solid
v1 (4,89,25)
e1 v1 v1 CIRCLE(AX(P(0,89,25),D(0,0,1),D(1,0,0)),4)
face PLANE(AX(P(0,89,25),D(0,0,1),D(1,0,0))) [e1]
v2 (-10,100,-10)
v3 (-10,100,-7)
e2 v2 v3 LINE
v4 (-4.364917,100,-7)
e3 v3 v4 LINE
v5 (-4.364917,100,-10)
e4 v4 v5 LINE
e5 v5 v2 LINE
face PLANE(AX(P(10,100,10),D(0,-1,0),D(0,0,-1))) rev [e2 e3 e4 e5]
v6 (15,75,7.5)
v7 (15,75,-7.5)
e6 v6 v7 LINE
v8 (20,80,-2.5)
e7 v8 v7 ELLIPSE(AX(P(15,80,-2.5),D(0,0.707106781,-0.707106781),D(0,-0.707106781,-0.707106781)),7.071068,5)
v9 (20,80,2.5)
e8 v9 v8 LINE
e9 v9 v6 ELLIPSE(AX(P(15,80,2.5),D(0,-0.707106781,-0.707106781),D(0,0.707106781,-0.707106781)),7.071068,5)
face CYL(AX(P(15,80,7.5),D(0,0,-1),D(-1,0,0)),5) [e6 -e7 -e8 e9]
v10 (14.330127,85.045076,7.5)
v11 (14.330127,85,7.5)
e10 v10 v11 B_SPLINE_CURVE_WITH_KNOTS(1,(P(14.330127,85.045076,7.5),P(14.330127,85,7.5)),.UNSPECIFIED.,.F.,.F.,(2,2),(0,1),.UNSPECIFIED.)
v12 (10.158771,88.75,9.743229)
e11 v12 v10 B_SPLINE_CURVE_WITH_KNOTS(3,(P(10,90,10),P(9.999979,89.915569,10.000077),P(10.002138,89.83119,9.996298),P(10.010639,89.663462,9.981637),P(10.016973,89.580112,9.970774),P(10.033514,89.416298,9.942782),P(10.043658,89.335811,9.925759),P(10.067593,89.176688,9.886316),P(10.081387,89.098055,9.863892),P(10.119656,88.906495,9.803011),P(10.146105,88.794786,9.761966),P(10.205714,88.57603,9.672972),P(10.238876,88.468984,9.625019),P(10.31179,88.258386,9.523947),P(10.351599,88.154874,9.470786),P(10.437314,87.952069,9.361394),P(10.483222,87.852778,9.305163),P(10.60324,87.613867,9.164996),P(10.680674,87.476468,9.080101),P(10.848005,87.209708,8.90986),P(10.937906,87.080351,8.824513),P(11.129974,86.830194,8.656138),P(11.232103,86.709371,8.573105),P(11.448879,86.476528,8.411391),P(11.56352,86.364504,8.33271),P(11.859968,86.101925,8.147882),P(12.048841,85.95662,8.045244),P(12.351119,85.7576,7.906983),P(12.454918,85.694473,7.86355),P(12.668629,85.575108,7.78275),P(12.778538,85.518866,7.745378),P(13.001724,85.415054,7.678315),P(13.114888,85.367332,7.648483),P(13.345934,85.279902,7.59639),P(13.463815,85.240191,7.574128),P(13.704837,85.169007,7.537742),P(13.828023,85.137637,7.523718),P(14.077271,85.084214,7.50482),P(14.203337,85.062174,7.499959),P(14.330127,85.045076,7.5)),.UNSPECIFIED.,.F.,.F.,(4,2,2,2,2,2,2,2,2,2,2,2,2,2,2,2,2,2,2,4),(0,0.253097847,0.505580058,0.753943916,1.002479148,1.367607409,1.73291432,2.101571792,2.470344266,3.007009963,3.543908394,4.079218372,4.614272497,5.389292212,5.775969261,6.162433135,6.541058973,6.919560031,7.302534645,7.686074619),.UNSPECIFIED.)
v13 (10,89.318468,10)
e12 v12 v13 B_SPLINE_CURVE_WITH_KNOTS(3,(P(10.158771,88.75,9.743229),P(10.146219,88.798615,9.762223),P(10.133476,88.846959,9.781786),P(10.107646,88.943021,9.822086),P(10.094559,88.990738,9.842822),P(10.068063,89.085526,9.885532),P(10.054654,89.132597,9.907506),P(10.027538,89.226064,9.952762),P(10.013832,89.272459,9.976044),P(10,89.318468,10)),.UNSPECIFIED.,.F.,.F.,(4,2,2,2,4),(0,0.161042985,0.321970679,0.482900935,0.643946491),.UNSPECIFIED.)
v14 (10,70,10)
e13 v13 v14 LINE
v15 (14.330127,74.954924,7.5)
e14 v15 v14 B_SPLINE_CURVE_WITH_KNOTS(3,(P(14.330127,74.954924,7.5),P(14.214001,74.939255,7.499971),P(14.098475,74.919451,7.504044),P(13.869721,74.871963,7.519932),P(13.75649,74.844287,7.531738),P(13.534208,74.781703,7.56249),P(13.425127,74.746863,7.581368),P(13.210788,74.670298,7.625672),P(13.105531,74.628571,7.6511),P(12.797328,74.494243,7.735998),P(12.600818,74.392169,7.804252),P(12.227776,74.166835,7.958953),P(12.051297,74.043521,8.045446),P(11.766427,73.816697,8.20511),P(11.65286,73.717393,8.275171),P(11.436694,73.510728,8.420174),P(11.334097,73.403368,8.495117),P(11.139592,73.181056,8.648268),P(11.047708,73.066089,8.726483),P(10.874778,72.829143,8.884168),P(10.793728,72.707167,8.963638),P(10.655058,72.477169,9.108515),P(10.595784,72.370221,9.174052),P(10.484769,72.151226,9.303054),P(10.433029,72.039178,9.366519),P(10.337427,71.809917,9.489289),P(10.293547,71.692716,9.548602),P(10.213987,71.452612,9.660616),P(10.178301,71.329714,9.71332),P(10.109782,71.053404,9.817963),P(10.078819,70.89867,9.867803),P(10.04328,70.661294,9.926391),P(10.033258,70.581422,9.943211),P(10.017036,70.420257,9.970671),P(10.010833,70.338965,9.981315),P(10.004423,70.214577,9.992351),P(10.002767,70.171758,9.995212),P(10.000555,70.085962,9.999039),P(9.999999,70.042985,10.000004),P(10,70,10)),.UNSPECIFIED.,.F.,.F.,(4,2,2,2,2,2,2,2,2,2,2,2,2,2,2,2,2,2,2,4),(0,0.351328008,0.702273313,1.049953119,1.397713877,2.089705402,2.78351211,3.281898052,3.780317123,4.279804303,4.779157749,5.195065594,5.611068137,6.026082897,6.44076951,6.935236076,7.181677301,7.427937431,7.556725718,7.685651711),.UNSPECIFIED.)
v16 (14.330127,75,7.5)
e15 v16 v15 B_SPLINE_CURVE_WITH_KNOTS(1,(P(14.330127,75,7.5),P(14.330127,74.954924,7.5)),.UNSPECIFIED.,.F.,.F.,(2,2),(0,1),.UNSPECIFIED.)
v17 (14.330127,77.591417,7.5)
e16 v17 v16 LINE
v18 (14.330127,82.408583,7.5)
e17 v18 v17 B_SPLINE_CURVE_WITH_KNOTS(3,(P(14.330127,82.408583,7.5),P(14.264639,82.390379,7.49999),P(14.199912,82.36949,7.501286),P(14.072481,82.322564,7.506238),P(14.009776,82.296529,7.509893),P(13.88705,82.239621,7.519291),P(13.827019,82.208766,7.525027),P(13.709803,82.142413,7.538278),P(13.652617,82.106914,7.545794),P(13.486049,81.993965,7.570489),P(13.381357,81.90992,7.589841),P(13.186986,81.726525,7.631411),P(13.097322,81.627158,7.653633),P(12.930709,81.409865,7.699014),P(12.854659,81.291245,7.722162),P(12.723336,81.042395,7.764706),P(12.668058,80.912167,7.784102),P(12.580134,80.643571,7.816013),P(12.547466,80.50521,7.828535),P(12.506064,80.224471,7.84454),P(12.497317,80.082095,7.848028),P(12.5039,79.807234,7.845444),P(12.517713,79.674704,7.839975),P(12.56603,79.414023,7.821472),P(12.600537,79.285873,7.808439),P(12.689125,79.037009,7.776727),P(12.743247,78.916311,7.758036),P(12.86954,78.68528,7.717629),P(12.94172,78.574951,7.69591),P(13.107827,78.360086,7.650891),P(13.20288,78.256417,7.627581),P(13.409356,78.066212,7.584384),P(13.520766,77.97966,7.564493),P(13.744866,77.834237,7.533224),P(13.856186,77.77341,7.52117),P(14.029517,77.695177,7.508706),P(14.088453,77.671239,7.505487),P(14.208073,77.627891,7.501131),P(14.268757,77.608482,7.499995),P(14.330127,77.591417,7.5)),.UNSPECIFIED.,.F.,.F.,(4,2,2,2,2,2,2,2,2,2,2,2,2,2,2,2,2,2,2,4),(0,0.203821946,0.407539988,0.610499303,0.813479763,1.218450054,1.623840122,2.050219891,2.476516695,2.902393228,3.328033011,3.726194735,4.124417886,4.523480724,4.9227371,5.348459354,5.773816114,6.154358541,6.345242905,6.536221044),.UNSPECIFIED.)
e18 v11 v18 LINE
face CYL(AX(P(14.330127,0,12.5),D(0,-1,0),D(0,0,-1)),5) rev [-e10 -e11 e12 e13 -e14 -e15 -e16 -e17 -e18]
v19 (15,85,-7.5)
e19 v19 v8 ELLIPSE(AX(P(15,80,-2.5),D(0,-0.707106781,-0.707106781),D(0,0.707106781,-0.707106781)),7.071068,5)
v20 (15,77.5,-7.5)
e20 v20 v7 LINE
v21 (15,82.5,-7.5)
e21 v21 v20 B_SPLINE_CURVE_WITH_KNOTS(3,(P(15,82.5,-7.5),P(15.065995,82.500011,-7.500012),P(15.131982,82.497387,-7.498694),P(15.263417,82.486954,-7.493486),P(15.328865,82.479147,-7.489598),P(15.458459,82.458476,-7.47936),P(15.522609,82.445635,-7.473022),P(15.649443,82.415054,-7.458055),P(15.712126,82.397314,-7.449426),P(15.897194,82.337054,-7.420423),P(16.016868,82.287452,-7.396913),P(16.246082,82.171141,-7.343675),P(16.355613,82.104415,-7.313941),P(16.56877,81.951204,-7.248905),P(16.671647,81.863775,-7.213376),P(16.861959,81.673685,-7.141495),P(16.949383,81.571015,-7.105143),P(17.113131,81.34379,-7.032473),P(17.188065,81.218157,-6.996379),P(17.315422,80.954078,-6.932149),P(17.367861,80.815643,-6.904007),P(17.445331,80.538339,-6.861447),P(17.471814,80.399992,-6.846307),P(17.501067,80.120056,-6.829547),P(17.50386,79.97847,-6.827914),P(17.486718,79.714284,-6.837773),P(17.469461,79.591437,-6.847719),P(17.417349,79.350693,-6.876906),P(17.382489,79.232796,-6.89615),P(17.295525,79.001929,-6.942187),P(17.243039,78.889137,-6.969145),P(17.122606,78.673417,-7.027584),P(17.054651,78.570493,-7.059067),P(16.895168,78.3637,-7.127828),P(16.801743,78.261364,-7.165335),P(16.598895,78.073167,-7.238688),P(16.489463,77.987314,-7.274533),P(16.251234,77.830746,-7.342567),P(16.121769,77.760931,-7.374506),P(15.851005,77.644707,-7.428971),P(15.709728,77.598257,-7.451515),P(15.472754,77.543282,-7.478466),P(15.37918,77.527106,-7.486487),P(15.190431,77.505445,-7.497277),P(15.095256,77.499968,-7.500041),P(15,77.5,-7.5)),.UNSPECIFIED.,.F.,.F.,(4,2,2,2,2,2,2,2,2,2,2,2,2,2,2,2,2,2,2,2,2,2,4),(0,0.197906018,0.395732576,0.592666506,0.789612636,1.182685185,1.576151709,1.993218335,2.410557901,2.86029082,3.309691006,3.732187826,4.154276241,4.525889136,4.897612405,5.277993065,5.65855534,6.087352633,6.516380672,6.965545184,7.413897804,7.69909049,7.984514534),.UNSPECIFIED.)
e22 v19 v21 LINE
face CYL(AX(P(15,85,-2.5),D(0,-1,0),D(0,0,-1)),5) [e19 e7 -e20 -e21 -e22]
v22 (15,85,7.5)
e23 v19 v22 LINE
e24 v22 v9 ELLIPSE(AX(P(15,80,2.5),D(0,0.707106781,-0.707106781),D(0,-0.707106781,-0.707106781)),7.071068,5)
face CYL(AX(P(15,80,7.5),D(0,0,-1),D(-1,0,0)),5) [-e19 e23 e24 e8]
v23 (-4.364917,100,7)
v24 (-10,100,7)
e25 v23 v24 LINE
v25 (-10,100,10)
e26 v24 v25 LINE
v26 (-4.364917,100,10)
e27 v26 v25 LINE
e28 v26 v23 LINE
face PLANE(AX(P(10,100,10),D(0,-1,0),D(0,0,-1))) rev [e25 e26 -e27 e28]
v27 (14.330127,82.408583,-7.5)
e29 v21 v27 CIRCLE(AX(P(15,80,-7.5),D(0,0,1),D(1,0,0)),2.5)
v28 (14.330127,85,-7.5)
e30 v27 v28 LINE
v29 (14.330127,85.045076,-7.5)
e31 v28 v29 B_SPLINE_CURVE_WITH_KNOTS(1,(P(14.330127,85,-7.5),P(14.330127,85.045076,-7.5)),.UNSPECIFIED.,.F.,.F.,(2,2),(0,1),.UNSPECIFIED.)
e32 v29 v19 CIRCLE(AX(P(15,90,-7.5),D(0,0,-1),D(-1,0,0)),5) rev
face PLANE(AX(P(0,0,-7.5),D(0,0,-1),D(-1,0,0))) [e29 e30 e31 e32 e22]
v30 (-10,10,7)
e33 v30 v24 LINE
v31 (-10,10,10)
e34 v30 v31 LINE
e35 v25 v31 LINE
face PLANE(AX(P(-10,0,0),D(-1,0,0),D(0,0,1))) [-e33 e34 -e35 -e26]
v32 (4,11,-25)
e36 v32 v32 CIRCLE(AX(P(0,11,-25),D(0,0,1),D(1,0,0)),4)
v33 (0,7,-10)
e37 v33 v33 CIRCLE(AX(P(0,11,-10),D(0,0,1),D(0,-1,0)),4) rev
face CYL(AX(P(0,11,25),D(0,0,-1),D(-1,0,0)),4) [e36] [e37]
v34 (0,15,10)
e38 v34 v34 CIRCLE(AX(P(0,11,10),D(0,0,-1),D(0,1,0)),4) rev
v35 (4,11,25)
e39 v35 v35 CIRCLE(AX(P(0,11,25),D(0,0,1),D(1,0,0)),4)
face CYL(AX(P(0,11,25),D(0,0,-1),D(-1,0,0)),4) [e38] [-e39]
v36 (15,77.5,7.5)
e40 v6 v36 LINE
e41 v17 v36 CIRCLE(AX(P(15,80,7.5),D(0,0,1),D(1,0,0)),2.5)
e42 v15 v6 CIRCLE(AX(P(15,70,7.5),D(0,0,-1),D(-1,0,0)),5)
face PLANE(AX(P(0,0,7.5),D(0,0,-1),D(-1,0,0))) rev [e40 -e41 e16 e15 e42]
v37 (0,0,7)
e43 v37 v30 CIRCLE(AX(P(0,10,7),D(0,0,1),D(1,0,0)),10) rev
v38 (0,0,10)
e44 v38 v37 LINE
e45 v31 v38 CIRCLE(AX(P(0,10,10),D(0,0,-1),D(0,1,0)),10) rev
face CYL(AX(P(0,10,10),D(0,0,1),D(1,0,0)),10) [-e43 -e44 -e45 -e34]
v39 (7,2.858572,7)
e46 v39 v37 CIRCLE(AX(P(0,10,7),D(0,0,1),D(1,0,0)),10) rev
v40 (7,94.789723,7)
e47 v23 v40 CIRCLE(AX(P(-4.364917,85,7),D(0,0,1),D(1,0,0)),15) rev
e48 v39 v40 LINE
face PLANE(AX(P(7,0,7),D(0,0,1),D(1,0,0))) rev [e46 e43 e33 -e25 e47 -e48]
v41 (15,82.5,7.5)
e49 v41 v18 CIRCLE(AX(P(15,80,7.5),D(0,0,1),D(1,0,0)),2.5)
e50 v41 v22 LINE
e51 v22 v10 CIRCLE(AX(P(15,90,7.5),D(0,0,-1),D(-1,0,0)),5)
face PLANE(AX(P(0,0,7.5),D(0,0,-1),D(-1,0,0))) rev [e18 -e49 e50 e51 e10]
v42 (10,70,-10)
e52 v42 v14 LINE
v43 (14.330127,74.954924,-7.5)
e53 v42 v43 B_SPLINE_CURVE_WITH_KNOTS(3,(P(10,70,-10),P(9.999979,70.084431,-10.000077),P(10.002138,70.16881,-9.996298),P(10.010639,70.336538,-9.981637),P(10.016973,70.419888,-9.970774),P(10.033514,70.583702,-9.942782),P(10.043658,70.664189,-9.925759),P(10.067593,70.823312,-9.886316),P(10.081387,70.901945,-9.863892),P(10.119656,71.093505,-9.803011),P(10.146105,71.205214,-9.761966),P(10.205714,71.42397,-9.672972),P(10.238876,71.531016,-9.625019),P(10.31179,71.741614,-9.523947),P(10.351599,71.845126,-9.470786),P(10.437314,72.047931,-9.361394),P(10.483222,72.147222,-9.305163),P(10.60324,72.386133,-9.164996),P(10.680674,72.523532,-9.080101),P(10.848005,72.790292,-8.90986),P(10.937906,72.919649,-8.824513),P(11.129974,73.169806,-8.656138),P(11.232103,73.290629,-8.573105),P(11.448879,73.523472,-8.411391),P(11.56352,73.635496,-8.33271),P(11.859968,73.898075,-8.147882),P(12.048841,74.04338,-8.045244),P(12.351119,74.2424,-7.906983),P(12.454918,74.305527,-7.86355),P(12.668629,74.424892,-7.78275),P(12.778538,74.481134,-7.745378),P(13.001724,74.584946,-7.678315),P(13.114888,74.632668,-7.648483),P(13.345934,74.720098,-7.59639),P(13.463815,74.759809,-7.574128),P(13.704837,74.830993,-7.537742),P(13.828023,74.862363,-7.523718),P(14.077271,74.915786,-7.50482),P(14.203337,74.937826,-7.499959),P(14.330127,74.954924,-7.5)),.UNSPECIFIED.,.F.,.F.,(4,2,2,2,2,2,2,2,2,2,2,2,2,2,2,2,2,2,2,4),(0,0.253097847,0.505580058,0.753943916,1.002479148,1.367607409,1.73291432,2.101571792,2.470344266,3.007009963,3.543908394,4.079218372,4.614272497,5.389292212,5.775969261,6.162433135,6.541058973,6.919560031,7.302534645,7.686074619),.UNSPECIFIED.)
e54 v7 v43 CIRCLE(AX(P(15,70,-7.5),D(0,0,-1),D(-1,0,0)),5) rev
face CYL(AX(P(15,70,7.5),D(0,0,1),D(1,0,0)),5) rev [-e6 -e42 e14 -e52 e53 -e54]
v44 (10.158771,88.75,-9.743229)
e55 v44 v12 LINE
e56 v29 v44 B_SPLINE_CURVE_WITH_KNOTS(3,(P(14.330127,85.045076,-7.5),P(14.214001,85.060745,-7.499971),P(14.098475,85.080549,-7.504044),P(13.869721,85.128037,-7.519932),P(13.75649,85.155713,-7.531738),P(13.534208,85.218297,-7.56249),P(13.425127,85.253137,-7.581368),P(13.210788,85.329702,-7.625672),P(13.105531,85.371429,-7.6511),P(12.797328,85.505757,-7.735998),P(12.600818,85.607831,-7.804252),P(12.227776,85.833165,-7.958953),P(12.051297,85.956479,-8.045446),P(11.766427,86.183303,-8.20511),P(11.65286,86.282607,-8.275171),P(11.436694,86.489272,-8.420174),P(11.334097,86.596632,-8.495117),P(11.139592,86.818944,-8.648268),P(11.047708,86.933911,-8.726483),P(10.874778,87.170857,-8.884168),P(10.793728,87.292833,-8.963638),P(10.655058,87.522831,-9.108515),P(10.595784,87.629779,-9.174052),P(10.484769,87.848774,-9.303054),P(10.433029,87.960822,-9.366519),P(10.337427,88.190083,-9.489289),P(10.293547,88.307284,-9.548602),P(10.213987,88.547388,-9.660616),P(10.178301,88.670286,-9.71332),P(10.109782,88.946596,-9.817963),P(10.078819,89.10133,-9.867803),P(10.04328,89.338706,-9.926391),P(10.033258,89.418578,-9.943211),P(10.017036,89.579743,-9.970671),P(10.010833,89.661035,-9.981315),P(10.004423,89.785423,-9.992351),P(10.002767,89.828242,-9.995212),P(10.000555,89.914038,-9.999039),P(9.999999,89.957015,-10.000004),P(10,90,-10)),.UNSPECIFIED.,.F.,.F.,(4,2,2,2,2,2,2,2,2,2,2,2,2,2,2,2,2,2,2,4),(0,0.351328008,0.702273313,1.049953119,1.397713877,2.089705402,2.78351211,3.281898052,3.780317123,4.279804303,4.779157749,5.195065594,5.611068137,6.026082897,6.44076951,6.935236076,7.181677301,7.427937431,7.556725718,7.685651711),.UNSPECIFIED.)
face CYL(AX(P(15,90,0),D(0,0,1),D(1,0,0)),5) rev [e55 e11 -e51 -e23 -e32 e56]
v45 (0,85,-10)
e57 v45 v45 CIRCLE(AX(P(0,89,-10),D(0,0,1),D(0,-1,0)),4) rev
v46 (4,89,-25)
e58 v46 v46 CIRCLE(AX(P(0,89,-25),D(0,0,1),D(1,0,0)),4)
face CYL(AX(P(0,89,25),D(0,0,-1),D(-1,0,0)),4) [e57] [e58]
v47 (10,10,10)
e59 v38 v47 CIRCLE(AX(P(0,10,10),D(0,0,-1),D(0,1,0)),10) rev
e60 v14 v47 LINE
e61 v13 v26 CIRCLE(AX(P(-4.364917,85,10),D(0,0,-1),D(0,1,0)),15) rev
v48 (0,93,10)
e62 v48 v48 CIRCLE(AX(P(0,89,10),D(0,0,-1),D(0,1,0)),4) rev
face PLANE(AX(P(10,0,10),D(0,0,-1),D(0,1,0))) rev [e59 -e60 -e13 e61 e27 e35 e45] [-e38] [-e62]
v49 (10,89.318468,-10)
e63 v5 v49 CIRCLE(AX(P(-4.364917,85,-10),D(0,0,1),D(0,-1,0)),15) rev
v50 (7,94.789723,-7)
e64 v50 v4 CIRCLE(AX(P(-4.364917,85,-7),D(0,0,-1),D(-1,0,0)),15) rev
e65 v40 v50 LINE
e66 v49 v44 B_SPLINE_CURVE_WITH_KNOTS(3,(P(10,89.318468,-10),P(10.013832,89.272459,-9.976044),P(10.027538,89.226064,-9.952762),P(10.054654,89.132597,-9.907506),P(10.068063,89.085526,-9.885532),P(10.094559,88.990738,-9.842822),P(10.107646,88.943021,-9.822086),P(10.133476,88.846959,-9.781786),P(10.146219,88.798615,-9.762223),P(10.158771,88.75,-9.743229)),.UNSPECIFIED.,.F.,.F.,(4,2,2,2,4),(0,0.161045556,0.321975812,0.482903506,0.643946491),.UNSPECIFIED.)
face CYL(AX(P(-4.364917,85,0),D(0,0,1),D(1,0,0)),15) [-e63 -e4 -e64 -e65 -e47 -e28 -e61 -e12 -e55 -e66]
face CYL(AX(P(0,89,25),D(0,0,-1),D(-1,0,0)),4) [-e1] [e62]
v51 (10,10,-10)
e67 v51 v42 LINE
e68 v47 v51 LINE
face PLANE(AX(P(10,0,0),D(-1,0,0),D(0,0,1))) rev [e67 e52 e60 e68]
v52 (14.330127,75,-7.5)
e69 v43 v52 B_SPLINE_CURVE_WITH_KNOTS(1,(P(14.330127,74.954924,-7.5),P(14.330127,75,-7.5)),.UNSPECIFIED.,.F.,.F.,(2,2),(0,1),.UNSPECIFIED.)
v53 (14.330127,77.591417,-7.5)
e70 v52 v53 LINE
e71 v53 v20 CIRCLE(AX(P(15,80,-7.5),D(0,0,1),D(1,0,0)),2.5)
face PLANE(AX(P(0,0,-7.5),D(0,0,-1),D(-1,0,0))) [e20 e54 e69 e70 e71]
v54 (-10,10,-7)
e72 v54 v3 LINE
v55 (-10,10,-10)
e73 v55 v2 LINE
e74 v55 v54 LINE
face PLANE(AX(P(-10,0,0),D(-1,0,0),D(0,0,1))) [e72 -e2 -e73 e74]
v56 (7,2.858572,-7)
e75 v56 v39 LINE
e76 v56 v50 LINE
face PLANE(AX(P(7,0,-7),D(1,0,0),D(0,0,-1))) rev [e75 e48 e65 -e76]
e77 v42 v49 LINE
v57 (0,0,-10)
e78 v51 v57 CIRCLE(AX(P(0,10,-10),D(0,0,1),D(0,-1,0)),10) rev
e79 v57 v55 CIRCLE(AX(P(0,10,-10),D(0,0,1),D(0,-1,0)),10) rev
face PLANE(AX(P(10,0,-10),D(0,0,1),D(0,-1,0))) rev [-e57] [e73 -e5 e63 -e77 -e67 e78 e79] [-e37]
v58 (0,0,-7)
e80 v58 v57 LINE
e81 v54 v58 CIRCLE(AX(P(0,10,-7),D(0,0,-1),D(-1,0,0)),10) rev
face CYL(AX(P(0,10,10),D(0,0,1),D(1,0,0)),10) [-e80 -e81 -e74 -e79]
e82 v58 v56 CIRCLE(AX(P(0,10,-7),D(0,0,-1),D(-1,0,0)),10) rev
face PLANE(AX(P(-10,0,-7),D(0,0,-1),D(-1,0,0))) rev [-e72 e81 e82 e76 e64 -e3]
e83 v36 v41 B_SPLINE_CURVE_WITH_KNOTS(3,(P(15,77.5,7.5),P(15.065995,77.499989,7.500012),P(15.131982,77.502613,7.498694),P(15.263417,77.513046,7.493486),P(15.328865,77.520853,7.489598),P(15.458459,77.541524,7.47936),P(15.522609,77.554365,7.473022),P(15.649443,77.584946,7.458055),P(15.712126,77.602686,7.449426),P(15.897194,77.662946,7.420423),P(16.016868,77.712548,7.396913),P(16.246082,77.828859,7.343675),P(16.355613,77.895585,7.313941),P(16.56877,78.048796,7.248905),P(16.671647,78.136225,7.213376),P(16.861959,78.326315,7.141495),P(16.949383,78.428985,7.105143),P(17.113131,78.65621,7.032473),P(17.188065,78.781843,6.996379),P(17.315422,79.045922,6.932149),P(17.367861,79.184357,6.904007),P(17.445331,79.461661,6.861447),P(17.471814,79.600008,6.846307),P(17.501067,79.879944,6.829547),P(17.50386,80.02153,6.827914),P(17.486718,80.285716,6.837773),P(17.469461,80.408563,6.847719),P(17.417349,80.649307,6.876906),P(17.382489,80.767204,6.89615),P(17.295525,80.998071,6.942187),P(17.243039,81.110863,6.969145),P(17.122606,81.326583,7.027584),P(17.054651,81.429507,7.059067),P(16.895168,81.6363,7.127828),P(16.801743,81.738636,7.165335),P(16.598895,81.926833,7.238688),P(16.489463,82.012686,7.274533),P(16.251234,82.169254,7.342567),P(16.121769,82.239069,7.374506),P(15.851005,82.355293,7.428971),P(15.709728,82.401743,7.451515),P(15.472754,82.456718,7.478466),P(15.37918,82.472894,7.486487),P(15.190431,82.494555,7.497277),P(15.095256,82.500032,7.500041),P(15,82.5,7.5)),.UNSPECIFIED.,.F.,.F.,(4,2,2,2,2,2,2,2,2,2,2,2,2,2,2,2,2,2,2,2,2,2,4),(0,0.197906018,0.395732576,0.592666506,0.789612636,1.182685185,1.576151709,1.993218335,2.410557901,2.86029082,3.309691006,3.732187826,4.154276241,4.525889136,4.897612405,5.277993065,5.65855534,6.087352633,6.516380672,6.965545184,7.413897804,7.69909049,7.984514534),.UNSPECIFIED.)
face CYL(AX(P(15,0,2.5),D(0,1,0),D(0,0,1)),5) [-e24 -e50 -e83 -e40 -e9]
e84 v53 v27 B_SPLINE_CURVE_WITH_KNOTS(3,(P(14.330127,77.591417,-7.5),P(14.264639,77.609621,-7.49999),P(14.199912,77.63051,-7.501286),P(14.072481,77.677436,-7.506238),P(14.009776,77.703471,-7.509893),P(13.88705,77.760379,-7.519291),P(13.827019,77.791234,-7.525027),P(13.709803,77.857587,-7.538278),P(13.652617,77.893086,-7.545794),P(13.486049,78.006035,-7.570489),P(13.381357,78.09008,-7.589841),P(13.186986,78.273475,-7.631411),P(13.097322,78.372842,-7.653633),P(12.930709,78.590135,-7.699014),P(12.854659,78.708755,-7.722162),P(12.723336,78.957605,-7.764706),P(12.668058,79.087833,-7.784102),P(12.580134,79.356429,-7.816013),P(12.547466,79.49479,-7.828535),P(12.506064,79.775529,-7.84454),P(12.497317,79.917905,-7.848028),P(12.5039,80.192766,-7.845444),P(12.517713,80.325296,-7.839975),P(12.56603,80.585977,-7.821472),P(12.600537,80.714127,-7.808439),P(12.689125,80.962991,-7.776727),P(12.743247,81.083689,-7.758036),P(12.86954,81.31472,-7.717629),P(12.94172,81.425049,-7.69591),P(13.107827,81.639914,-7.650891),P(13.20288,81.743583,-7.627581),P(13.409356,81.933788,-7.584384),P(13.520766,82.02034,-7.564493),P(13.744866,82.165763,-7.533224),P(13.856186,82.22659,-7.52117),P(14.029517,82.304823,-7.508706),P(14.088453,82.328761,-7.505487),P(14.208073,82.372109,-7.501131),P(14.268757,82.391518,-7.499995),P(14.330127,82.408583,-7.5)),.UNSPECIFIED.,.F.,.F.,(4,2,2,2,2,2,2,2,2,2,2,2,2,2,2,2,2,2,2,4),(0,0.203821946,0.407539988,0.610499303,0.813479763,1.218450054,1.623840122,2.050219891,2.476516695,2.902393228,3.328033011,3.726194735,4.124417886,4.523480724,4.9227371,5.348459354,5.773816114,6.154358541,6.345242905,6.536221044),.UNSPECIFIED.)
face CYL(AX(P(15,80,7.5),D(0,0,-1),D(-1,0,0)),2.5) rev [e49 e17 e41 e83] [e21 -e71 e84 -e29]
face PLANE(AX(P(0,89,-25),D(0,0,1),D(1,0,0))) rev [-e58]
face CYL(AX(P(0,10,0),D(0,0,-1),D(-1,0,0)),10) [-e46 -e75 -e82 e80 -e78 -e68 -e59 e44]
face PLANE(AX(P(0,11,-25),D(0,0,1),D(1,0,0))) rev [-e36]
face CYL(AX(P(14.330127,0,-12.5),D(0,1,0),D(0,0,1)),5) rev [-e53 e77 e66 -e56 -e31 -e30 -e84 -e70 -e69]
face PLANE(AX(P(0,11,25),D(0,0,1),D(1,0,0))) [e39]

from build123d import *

# Parameters (mm, degrees)
SKETCH1_W               = 20
SKETCH1_H               = 100
BOSS_EXTRUDE1_DEPTH     = 10
SKETCH3_R               = 4
BOSS_EXTRUDE2_DEPTH     = 25
FILLET1_R               = 10
SKETCH5_W               = 10
SKETCH5_H               = 10
SKETCH5_R               = 2.5
BOSS_EXTRUDE3_DEPTH     = 7.5
FILLET2_R               = 5
CUT_EXTRUDE1_DEPTH      = 106.000000019
CUT_EXTRUDE1_DEPTH_BACK = 106.000000019
SKETCH6_W               = 17
SKETCH6_H               = 14
FILLET3_R               = 15


# Some blends are built 0.0001 mm under size
with BuildPart() as part:
    # Sketch1 → Boss-Extrude1 (new, symmetric)
    with BuildSketch(Plane(origin=(0, 0, 0), x_dir=(0, 0, -1), z_dir=(1, 0, 0))):
        with Locations((0, 50)):
            Rectangle(SKETCH1_W, SKETCH1_H)
    extrude(amount=BOSS_EXTRUDE1_DEPTH, both=True)

    # Sketch3 → Boss-Extrude2 (add, symmetric)
    with BuildSketch(Plane.XY):
        with Locations(Location((0, 11, 0), (0, 0, 270))):
            Circle(SKETCH3_R)
        with Locations(Location((0, 89, 0), (0, 0, 270))):
            Circle(SKETCH3_R)
    extrude(amount=BOSS_EXTRUDE2_DEPTH, both=True)

    # Fillet1
    fillet1_edges = [part.edges().sort_by_distance(p)[0] for p in [
        (10, 0, 0),
        (-10, 0, 0),
    ]]
    fillet(fillet1_edges, radius=FILLET1_R - 0.0001)  # a hair under: the kernel refuses the full size

    # Sketch5 → Boss-Extrude3 (add, symmetric)
    with BuildSketch(Plane.XY):
        with Locations((15, 80)):
            Rectangle(SKETCH5_W, SKETCH5_H)
        with Locations((15, 80)):
            Circle(SKETCH5_R, mode=Mode.SUBTRACT)
    extrude(amount=BOSS_EXTRUDE3_DEPTH, both=True)

    # Fillet2
    # the kernel refuses this fillet: 5 mm, written as the material it takes off along each edge
    with BuildSketch(Plane(origin=(20, 97.5, 7.5), x_dir=(-1, 0, 0), z_dir=(0, -1, 0))) as fillet2_piece_1:
        with BuildLine():
            CenterArc((FILLET2_R, FILLET2_R), FILLET2_R, 180, 90)
            Line((0, FILLET2_R), (0, 0))
            Line((0, 0), (FILLET2_R, 0))
        make_face()
    extrude(amount=35, mode=Mode.SUBTRACT)
    with BuildSketch(Plane(origin=(20, 97.5, -7.5), x_dir=(-1, 0, 0), z_dir=(0, -1, 0))) as fillet2_piece_2:
        with BuildLine():
            CenterArc((FILLET2_R, -FILLET2_R), FILLET2_R, 90, 90)
            Line((0, -FILLET2_R), (0, 0))
            Line((0, 0), (FILLET2_R, 0))
        make_face()
    extrude(amount=35, mode=Mode.SUBTRACT)
    with BuildSketch(Plane(origin=(20, 75, 20), x_dir=(-1, 0, 0), z_dir=(0, 0, -1))) as fillet2_piece_3:
        with BuildLine():
            CenterArc((FILLET2_R, FILLET2_R), FILLET2_R, 180, 90)
            Line((0, FILLET2_R), (0, 0))
            Line((0, 0), (FILLET2_R, 0))
        make_face()
    extrude(amount=40, mode=Mode.SUBTRACT)
    with BuildSketch(Plane(origin=(20, 85, 20), x_dir=(-1, 0, 0), z_dir=(0, 0, -1))) as fillet2_piece_4:
        with BuildLine():
            CenterArc((FILLET2_R, -FILLET2_R), FILLET2_R, 90, 90)
            Line((0, -FILLET2_R), (0, 0))
            Line((0, 0), (FILLET2_R, 0))
        make_face()
    extrude(amount=40, mode=Mode.SUBTRACT)
    # the kernel refuses this fillet: 5 mm, written as the material it adds along each edge
    with BuildSketch(Plane(origin=(10, 75, 7.5), x_dir=(0, 0, 1), z_dir=(0, 1, 0))) as fillet2_2_piece_1_section:
        with BuildLine():
            CenterArc((5, 4.330127019), FILLET2_R, 180, 60)
            Line((0, 4.330127019), (0, 0))
            Line((0, 0), (2.5, 0))
        make_face()
    fillet2_2_piece_1 = extrude(amount=10, mode=Mode.PRIVATE)
    fillet2_2_piece_1 = fillet2_2_piece_1 - Plane(origin=(15, 80, 7.5), x_dir=(1, 0, 0), z_dir=(0, 0, -1)) * Cylinder(2.5, 38, mode=Mode.PRIVATE)
    add(fillet2_2_piece_1)
    with BuildSketch(Plane(origin=(10, 75, -7.5), x_dir=(0, 0, -1), z_dir=(0, 1, 0))) as fillet2_2_piece_2_section:
        with BuildLine():
            CenterArc((5, -4.330127019), FILLET2_R, 120, 60)
            Line((0, -4.330127019), (0, 0))
            Line((0, 0), (2.5, 0))
        make_face()
    fillet2_2_piece_2 = extrude(amount=10, mode=Mode.PRIVATE)
    fillet2_2_piece_2 = fillet2_2_piece_2 - Plane(origin=(15, 80, -7.5), x_dir=(1, 0, 0), z_dir=(0, 0, -1)) * Cylinder(2.5, 38, mode=Mode.PRIVATE)
    add(fillet2_2_piece_2)
    with BuildSketch(Plane(origin=(10, 85, -7.5), x_dir=(0, 1, 0), z_dir=(0, 0, 1))) as fillet2_2_piece_3:
        with BuildLine():
            CenterArc((FILLET2_R, -FILLET2_R), FILLET2_R, 90, 90)
            Line((0, -FILLET2_R), (0, 0))
            Line((0, 0), (FILLET2_R, 0))
        make_face()
    extrude(amount=15)
    with BuildSketch(Plane(origin=(10, 75, -7.5), x_dir=(0, -1, 0), z_dir=(0, 0, 1))) as fillet2_2_piece_4:
        with BuildLine():
            CenterArc((FILLET2_R, FILLET2_R), FILLET2_R, 180, 90)
            Line((0, FILLET2_R), (0, 0))
            Line((0, 0), (FILLET2_R, 0))
        make_face()
    extrude(amount=15)
    with BuildSketch(Plane(origin=(10, 64.174682453, 7.5), x_dir=(0, 0, 1), z_dir=(0, 1, 0))) as fillet2_2_piece_5a_section:
        with BuildLine():
            CenterArc((5, 4.330127019), FILLET2_R, 180, 60)
            Line((0, 4.330127019), (0, 0))
            Line((0, 0), (2.5, 0))
        make_face()
    fillet2_2_piece_5a = extrude(amount=20.825317547, mode=Mode.PRIVATE)
    fillet2_2_piece_5a = split(fillet2_2_piece_5a, bisect_by=Plane(origin=(10, 75, 7.5), z_dir=(0, -1, 0)), keep=Keep.TOP, mode=Mode.PRIVATE)
    with BuildSketch(Plane(origin=(10, 75, -7.5), x_dir=(0, -1, 0), z_dir=(0, 0, 1))) as fillet2_2_piece_5b_section:
        with BuildLine():
            CenterArc((FILLET2_R, FILLET2_R), FILLET2_R, 180, 90)
            Line((0, FILLET2_R), (0, 0))
            Line((0, 0), (FILLET2_R, 0))
        make_face()
    fillet2_2_piece_5b = extrude(amount=27.5, mode=Mode.PRIVATE)
    fillet2_2_piece_5b = split(fillet2_2_piece_5b, bisect_by=Plane(origin=(10, 75, 10), z_dir=(0, 0, -1)), keep=Keep.TOP, mode=Mode.PRIVATE)
    fillet2_2_piece_5b = split(fillet2_2_piece_5b, bisect_by=Plane(origin=(10, 75, 7.5), z_dir=(0, 0, 1)), keep=Keep.TOP, mode=Mode.PRIVATE)
    fillet2_2_piece_5 = fillet2_2_piece_5a & fillet2_2_piece_5b
    add(fillet2_2_piece_5)
    with BuildSketch(Plane(origin=(10, 85, -7.5), x_dir=(0, 1, 0), z_dir=(0, 0, 1))) as fillet2_2_piece_6a_section:
        with BuildLine():
            CenterArc((FILLET2_R, -FILLET2_R), FILLET2_R, 90, 90)
            Line((0, -FILLET2_R), (0, 0))
            Line((0, 0), (FILLET2_R, 0))
        make_face()
    fillet2_2_piece_6a = extrude(amount=27.5, mode=Mode.PRIVATE)
    fillet2_2_piece_6a = split(fillet2_2_piece_6a, bisect_by=Plane(origin=(10, 85, 10), z_dir=(0, 0, -1)), keep=Keep.TOP, mode=Mode.PRIVATE)
    fillet2_2_piece_6a = split(fillet2_2_piece_6a, bisect_by=Plane(origin=(10, 85, 7.5), z_dir=(0, 0, 1)), keep=Keep.TOP, mode=Mode.PRIVATE)
    with BuildSketch(Plane(origin=(10, 75, 7.5), x_dir=(0, 0, 1), z_dir=(0, 1, 0))) as fillet2_2_piece_6b_section:
        with BuildLine():
            CenterArc((5, 4.330127019), FILLET2_R, 180, 60)
            Line((0, 4.330127019), (0, 0))
            Line((0, 0), (2.5, 0))
        make_face()
    fillet2_2_piece_6b = extrude(amount=20.825317547, mode=Mode.PRIVATE)
    fillet2_2_piece_6b = split(fillet2_2_piece_6b, bisect_by=Plane(origin=(10, 85, 7.5), z_dir=(0, 1, 0)), keep=Keep.TOP, mode=Mode.PRIVATE)
    fillet2_2_piece_6 = fillet2_2_piece_6a & fillet2_2_piece_6b
    add(fillet2_2_piece_6)
    with BuildSketch(Plane(origin=(10, 75, -20), x_dir=(0, -1, 0), z_dir=(0, 0, 1))) as fillet2_2_piece_7a_section:
        with BuildLine():
            CenterArc((FILLET2_R, FILLET2_R), FILLET2_R, 180, 90)
            Line((0, FILLET2_R), (0, 0))
            Line((0, 0), (FILLET2_R, 0))
        make_face()
    fillet2_2_piece_7a = extrude(amount=27.5, mode=Mode.PRIVATE)
    fillet2_2_piece_7a = split(fillet2_2_piece_7a, bisect_by=Plane(origin=(10, 75, -10), z_dir=(0, 0, 1)), keep=Keep.TOP, mode=Mode.PRIVATE)
    fillet2_2_piece_7a = split(fillet2_2_piece_7a, bisect_by=Plane(origin=(10, 75, -7.5), z_dir=(0, 0, -1)), keep=Keep.TOP, mode=Mode.PRIVATE)
    with BuildSketch(Plane(origin=(10, 64.174682453, -7.5), x_dir=(0, 0, -1), z_dir=(0, 1, 0))) as fillet2_2_piece_7b_section:
        with BuildLine():
            CenterArc((5, -4.330127019), FILLET2_R, 120, 60)
            Line((0, -4.330127019), (0, 0))
            Line((0, 0), (2.5, 0))
        make_face()
    fillet2_2_piece_7b = extrude(amount=20.825317547, mode=Mode.PRIVATE)
    fillet2_2_piece_7b = split(fillet2_2_piece_7b, bisect_by=Plane(origin=(10, 75, -7.5), z_dir=(0, -1, 0)), keep=Keep.TOP, mode=Mode.PRIVATE)
    fillet2_2_piece_7 = fillet2_2_piece_7a & fillet2_2_piece_7b
    add(fillet2_2_piece_7)
    with BuildSketch(Plane(origin=(10, 85, -20), x_dir=(0, 1, 0), z_dir=(0, 0, 1))) as fillet2_2_piece_8a_section:
        with BuildLine():
            CenterArc((FILLET2_R, -FILLET2_R), FILLET2_R, 90, 90)
            Line((0, -FILLET2_R), (0, 0))
            Line((0, 0), (FILLET2_R, 0))
        make_face()
    fillet2_2_piece_8a = extrude(amount=27.5, mode=Mode.PRIVATE)
    fillet2_2_piece_8a = split(fillet2_2_piece_8a, bisect_by=Plane(origin=(10, 85, -10), z_dir=(0, 0, 1)), keep=Keep.TOP, mode=Mode.PRIVATE)
    fillet2_2_piece_8a = split(fillet2_2_piece_8a, bisect_by=Plane(origin=(10, 85, -7.5), z_dir=(0, 0, -1)), keep=Keep.TOP, mode=Mode.PRIVATE)
    with BuildSketch(Plane(origin=(10, 75, -7.5), x_dir=(0, 0, -1), z_dir=(0, 1, 0))) as fillet2_2_piece_8b_section:
        with BuildLine():
            CenterArc((5, -4.330127019), FILLET2_R, 120, 60)
            Line((0, -4.330127019), (0, 0))
            Line((0, 0), (2.5, 0))
        make_face()
    fillet2_2_piece_8b = extrude(amount=20.825317547, mode=Mode.PRIVATE)
    fillet2_2_piece_8b = split(fillet2_2_piece_8b, bisect_by=Plane(origin=(10, 85, -7.5), z_dir=(0, 1, 0)), keep=Keep.TOP, mode=Mode.PRIVATE)
    fillet2_2_piece_8 = fillet2_2_piece_8a & fillet2_2_piece_8b
    add(fillet2_2_piece_8)

    # Sketch6 → Cut-Extrude1 (cut, two sides: drawn at the far end of the back side and taken through both)
    with BuildSketch(Plane(origin=(0, 100, 0), x_dir=(1, 0, 0), z_dir=(0, 1, 0)).offset(-CUT_EXTRUDE1_DEPTH_BACK)):
        with Locations((-1.5, 0)):
            Rectangle(SKETCH6_W, SKETCH6_H)
    extrude(amount=CUT_EXTRUDE1_DEPTH + CUT_EXTRUDE1_DEPTH_BACK, mode=Mode.SUBTRACT)

    # Fillet3
    # the kernel refuses this fillet: 15 mm, written as the material it takes off along each edge
    with BuildSketch(Plane(origin=(10, 100, -45.912291828), x_dir=(0.014111556263048879, -0.9999004270325296, 0), z_dir=(0, 0, 1))) as fillet3_piece_1:
        with BuildLine():
            CenterArc((14.795795075, -14.575159718), FILLET3_R, 103.668952733, 75.522487814)
            Line((-0.202711331, -14.363486374), (-1.702561971, -14.342319039))
            Line((-1.702561971, -14.342319039), (-1.499850641, 0.021167334))
            Line((-1.499850641, 0.021167334), (0.021167334, 1.499850641))
            ThreePointArc((0.021167334, 1.499850641), (10.020171605, 1.358735078), (10.896652831, 1.457515972))
            Line((10.896652831, 1.457515972), (11.251120307, 0))
        make_face()
    extrude(amount=91.824583655, mode=Mode.SUBTRACT)


solid = part.part
